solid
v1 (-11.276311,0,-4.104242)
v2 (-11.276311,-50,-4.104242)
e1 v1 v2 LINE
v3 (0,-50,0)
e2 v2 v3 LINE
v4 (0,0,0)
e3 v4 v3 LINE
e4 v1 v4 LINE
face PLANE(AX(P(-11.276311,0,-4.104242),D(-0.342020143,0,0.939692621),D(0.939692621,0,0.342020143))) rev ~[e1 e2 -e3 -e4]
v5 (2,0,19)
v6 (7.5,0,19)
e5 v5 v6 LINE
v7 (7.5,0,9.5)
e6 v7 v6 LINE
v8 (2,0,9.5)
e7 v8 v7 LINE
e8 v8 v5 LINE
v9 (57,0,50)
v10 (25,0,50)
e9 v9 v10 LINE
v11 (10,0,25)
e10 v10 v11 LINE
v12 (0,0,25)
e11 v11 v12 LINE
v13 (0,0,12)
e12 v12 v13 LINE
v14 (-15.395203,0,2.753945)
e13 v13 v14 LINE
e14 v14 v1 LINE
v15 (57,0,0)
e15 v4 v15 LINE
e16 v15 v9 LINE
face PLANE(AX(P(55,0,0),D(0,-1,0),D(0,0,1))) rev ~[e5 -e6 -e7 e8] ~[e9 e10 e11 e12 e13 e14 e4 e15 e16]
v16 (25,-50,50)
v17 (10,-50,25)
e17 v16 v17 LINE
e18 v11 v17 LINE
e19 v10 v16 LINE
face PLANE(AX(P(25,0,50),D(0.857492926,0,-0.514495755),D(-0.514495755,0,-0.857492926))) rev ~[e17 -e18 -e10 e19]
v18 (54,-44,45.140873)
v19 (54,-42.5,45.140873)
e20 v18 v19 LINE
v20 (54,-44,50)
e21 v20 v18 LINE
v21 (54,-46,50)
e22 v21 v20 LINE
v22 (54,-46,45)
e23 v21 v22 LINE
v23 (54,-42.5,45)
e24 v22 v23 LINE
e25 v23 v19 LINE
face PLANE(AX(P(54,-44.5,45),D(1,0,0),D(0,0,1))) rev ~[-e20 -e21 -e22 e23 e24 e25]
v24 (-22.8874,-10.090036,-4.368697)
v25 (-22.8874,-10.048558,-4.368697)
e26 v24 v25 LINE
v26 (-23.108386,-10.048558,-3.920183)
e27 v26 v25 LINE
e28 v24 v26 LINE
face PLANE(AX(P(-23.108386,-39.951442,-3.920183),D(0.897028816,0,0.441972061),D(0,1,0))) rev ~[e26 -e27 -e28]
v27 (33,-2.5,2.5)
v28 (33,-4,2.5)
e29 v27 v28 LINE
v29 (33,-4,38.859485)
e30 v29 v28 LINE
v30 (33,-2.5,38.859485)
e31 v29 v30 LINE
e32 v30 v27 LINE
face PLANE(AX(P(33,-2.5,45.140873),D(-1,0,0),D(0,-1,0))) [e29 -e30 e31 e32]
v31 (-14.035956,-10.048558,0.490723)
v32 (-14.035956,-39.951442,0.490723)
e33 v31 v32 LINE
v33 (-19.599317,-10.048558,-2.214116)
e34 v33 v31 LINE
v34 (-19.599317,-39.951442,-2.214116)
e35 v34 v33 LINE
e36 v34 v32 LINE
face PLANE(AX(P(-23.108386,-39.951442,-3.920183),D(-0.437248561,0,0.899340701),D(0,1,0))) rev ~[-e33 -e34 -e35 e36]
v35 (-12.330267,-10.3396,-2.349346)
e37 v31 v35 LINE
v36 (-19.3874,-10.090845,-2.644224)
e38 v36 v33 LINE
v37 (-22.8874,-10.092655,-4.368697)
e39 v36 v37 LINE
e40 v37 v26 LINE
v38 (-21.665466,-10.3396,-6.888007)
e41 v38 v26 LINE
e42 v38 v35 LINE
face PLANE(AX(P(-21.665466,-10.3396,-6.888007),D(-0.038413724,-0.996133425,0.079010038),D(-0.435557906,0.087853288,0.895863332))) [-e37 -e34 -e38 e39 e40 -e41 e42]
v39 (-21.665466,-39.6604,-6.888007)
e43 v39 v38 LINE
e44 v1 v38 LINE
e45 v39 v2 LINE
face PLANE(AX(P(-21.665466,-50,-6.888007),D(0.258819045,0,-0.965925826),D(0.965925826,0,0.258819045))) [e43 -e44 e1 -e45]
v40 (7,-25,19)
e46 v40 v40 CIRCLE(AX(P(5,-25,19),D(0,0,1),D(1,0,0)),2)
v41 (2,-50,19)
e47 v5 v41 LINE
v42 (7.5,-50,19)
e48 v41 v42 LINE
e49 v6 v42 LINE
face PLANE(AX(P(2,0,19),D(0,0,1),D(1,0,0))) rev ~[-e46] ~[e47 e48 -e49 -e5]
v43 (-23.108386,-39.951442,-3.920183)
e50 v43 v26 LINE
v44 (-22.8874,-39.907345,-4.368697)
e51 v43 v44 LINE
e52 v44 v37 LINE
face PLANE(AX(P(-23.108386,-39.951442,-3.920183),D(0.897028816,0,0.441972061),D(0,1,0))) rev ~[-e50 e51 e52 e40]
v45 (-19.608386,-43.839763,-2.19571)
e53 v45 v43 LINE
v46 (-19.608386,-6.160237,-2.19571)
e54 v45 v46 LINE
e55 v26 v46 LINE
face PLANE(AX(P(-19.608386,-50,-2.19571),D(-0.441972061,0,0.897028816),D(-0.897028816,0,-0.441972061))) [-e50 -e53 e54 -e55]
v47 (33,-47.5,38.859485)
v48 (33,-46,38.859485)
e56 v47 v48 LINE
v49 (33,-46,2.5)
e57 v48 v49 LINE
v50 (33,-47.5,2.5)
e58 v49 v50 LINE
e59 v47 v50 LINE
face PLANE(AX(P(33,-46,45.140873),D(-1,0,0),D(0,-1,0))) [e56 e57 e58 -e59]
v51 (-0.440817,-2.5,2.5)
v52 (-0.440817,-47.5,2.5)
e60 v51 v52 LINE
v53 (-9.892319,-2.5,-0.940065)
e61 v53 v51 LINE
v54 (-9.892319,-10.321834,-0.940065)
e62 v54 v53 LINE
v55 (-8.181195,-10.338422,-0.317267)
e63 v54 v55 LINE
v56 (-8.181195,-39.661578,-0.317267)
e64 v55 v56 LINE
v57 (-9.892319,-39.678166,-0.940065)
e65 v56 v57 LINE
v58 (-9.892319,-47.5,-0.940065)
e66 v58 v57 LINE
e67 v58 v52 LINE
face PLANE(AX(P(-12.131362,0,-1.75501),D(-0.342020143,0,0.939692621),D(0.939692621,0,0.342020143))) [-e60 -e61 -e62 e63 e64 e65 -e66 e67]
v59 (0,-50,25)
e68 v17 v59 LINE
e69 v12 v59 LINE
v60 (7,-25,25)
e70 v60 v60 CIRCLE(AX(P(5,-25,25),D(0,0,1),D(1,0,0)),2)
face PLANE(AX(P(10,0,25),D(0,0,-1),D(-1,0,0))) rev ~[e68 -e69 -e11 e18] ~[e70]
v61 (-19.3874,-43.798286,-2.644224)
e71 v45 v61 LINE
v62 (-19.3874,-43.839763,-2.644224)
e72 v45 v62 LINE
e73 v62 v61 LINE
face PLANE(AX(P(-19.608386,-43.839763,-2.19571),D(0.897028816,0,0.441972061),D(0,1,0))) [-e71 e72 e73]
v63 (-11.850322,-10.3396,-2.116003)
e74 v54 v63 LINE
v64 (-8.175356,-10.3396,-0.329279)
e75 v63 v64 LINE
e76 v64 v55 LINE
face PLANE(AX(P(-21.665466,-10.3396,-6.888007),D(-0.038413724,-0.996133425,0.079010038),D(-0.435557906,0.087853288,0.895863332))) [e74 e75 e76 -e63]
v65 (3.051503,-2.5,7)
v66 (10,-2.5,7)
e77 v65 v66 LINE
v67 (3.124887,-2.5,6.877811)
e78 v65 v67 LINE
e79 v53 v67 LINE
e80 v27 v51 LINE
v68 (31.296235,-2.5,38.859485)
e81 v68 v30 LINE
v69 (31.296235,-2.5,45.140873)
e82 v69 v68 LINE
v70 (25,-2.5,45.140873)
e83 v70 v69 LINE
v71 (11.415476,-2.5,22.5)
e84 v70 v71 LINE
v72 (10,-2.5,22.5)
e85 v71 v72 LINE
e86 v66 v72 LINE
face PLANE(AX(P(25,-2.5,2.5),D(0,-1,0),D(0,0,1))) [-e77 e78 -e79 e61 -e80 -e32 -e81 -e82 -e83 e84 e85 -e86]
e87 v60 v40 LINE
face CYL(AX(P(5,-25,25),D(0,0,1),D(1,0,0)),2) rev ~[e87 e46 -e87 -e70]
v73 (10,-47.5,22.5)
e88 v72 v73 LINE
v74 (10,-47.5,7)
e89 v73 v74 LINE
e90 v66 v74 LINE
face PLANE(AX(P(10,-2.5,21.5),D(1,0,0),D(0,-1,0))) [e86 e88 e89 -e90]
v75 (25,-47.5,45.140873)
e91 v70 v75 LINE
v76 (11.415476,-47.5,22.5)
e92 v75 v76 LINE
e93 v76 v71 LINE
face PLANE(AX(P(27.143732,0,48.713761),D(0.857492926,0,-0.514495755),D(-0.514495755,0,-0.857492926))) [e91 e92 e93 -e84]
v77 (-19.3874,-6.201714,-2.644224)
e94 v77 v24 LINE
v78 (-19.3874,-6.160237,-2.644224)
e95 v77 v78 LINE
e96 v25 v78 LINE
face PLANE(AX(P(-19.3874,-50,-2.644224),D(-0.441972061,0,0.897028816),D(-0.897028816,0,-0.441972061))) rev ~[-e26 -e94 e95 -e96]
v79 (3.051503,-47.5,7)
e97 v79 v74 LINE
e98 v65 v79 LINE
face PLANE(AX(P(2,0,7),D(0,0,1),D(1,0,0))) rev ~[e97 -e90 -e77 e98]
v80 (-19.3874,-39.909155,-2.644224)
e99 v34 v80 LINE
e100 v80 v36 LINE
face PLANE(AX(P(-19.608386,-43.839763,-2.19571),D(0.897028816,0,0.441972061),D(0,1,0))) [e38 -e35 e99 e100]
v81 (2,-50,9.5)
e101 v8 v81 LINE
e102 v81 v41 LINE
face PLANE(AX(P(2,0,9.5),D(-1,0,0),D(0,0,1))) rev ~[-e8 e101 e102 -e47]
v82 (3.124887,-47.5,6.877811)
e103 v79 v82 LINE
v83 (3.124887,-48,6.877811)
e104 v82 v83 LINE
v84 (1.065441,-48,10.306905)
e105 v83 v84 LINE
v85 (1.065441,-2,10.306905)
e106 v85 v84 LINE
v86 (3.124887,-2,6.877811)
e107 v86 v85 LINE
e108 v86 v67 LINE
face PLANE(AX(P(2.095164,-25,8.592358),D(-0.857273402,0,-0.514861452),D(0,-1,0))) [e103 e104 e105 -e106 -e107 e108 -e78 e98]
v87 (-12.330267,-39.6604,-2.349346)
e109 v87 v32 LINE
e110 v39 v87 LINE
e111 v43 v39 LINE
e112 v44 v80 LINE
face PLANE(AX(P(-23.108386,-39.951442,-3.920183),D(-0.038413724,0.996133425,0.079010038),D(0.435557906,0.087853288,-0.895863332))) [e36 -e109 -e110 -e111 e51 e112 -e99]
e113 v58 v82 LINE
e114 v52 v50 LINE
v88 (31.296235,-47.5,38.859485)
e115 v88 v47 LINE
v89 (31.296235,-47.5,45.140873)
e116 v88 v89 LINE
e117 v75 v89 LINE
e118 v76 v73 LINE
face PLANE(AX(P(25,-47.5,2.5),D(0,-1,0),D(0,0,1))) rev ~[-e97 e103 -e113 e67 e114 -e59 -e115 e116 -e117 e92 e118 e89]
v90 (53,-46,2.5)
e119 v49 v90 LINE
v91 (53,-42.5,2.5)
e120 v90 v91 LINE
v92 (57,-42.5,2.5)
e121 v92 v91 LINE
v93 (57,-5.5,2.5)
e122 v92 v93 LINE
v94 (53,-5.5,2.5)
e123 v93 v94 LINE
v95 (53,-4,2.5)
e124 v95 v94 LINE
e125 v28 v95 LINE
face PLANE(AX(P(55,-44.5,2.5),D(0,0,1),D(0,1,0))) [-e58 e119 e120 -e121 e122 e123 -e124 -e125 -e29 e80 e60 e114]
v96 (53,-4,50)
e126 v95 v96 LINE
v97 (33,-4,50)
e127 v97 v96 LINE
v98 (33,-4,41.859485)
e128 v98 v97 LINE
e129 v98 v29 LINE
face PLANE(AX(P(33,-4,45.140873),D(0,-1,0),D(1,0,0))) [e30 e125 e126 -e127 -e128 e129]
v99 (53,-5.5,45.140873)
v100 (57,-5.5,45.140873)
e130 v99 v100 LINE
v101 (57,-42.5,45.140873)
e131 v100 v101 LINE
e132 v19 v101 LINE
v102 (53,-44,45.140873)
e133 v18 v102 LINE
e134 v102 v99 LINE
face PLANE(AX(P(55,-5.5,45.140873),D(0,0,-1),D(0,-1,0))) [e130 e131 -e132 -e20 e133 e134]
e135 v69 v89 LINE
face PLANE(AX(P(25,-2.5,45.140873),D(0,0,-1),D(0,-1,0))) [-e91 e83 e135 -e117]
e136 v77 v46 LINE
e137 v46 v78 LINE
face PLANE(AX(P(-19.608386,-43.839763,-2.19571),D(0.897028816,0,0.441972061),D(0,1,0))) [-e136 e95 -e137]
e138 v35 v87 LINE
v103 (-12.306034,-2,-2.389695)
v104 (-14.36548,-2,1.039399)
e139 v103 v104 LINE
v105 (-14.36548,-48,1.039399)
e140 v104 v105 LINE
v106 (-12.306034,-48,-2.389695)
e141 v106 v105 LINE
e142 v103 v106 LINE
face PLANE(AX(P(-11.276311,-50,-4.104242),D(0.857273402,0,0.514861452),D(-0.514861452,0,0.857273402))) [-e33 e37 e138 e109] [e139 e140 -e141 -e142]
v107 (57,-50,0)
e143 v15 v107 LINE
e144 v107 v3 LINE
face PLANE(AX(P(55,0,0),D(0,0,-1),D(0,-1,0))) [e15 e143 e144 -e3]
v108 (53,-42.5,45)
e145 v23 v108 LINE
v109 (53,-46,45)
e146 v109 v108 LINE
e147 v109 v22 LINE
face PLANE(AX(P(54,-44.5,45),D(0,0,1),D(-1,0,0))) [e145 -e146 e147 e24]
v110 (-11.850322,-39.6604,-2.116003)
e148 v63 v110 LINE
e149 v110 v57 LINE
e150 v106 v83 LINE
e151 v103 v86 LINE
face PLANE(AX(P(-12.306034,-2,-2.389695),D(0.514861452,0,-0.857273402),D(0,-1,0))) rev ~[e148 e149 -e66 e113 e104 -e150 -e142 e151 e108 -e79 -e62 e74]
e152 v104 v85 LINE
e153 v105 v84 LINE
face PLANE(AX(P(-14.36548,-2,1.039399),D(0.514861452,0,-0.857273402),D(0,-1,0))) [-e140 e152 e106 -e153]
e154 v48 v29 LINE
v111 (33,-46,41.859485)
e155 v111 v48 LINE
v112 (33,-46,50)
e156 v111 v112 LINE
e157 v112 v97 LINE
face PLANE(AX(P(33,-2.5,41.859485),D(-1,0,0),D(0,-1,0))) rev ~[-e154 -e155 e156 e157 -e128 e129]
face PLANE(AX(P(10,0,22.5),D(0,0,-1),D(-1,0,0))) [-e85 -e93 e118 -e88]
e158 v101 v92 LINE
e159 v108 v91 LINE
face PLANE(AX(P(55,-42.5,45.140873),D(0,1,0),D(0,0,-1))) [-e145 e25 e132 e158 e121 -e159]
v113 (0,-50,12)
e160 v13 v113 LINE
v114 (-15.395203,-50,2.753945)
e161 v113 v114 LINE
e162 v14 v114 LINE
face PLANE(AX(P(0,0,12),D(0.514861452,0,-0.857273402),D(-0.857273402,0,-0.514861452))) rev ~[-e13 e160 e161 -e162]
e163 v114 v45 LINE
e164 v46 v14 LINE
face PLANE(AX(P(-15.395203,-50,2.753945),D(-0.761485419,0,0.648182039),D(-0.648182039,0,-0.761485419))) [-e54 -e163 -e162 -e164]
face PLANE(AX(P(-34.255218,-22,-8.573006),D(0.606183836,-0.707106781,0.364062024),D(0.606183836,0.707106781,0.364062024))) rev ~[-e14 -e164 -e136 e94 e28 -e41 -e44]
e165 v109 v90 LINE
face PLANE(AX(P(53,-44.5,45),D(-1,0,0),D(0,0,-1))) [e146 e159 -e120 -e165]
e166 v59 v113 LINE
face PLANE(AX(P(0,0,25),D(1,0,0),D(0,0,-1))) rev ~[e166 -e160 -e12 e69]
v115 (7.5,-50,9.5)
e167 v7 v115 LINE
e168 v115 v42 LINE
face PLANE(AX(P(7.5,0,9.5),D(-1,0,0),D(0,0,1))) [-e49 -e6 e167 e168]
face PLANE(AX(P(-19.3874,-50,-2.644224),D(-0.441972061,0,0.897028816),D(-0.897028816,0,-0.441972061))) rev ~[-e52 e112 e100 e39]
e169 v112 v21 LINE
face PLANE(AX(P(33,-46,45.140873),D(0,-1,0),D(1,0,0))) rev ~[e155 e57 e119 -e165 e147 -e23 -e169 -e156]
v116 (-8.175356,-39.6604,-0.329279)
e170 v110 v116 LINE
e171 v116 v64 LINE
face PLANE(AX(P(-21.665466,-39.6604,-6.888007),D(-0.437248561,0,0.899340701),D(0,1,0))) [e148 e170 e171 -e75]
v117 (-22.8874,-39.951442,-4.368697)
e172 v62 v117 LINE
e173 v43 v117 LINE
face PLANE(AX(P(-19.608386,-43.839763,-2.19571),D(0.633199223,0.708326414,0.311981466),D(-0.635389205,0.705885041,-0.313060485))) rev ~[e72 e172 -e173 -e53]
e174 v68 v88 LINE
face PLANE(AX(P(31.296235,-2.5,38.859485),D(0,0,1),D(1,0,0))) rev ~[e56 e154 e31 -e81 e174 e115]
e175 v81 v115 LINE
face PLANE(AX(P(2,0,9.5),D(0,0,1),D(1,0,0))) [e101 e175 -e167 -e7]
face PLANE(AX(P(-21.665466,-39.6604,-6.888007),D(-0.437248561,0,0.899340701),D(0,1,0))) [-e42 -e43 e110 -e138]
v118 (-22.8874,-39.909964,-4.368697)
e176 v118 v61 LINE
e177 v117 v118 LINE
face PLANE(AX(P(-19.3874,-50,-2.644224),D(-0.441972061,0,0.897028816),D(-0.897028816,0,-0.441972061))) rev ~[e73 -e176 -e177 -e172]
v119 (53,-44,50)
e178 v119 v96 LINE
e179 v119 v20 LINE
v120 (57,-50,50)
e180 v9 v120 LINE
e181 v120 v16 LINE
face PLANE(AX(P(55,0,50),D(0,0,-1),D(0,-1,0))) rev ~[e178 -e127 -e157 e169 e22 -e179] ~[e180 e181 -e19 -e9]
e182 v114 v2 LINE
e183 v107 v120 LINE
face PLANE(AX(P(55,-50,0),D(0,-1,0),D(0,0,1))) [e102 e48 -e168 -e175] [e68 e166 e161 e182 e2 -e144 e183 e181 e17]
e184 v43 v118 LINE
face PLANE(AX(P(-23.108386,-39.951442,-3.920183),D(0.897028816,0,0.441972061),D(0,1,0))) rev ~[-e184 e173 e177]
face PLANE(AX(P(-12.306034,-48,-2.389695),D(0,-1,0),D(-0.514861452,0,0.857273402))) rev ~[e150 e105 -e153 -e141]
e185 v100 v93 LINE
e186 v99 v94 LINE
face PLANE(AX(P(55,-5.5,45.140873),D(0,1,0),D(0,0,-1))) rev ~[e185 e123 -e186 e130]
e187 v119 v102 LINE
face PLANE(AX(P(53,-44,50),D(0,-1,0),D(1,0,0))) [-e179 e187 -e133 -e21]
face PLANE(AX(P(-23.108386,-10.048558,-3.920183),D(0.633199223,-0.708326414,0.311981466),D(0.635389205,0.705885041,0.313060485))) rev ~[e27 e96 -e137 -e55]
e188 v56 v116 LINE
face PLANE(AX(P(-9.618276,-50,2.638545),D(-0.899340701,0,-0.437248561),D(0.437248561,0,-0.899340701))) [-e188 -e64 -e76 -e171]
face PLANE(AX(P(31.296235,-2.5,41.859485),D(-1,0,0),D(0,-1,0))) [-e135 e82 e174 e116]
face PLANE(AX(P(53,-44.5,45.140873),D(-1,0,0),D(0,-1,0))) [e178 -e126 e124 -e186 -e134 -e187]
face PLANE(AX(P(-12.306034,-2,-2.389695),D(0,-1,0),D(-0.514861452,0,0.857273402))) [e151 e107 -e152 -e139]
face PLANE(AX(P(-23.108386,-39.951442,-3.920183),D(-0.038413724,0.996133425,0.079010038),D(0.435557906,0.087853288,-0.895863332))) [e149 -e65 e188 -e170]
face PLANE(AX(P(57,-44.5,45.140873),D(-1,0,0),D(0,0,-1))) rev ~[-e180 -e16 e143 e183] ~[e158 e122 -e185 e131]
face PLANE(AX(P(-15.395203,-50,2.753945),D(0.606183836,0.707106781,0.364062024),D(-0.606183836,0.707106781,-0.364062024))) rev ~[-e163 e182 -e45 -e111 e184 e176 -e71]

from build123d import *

# Parameters (mm, degrees)
F0_W      = 5.5
F0_H      = 9.5
F1_DEPTH  = 50
F2_T      = -2.5
F3_W      = 46
F3_H      = 4
F4_DEPTH  = 18
F5_DEPTH  = 30
F6_W      = 2
F6_H      = 3
F7_DEPTH  = 42.640873421
F8_W      = 20
F8_H      = 42
F9_DEPTH  = 4.859126579
F10_W     = 1.7037652433
F10_H     = 3.2813884318
F11_DEPTH = 45
F12_W     = 1
F12_H     = 2
F13_DEPTH = 5
F14_DEPTH = 42.640873421
F15_DEPTH = 5
F16_DEPTH = 3
F17_DEPTH = 2
F20_DEPTH = 50
F21_DEPTH = 25
F22_DEPTH = 15
F23_DEPTH = 0.5
F24_DEPTH = 3
F25_DEPTH = 2
F26_R     = 2
F27_DEPTH = 6


with BuildPart() as f1:
    # F0 (on Front) → F1 (new body)
    with BuildSketch(Plane.XZ):
        Polygon((0, 12), (0, 0), (20, 0), (20, 25), (10, 25), (0, 25), align=None)
        with Locations((4.75, 14.25)):
            Rectangle(F0_W, F0_H, mode=Mode.SUBTRACT)
        Polygon((20, 25), (20, 0), (25, 0), (25, 50), (10, 25), align=None)
        Polygon((-11.2763114494, -4.1042417199), (0, 0), (0, 12), (-15.3952030634, 2.7539454948), align=None)
    extrude(amount=F1_DEPTH)

    # F2
    f2_openings = [f1.faces().sort_by_distance(p)[0] for p in [
        (25, -25, 25),
    ]]
    offset(amount=F2_T, openings=f2_openings, kind=Kind.INTERSECTION)

    # F3 (on face) → F4 (cut)
    with BuildSketch(Plane(origin=(-10.0986787248, 0, -6.0650667312), x_dir=(0, -1, 0), z_dir=(-0.8572734018, 0, -0.5148614518))):
        with Locations((25, 6.2872808221)):
            Rectangle(F3_W, F3_H)
    extrude(amount=-F4_DEPTH, mode=Mode.SUBTRACT)

    # F5 (add): a face of the model
    f5_faces = [f1.faces().sort_by_distance(p)[0] for p in [
        (25, -25, 0.7071067812),
    ]]
    extrude(f5_faces, amount=F5_DEPTH)

    # F6 (on face) → F7 (join, through all)
    with BuildSketch(Plane(origin=(0, 0, 45.140873421), x_dir=(1, 0, 0), z_dir=(0, 0, -1))):
        with Locations((54, 46)):
            Rectangle(F6_W, F6_H)
        with Locations((54, 4)):
            Rectangle(F6_W, F6_H)
    extrude(amount=F7_DEPTH)

    # F8 (on face) → F9 (cut, through all)
    with BuildSketch(Plane.XY.offset(50)):
        with Locations((43, -25)):
            Rectangle(F8_W, F8_H)
    extrude(amount=-F9_DEPTH, mode=Mode.SUBTRACT)

    # F10 (on face) → F11 (join, through all)
    with BuildSketch(Plane.XZ.offset(2.5)):
        with Locations((32.1481173784, 43.5001792051)):
            Rectangle(F10_W, F10_H)
    extrude(amount=F11_DEPTH)

    # F12 (on face) → F13 (cut)
    with BuildSketch(Plane.XY.offset(50)):
        with Locations((53.5, -45)):
            Rectangle(F12_W, F12_H)
    extrude(amount=-F13_DEPTH, mode=Mode.SUBTRACT)

    # F14 (add, through all): faces of the model
    f14_faces = [f1.faces().sort_by_distance(p)[0] for p in [
        (43, -46.75, 45.140873421),
        (43, -3.25, 45.140873421),
    ]]
    extrude(f14_faces, amount=F14_DEPTH)

    # F15 (add): a face of the model
    f15_faces = [f1.faces().sort_by_distance(p)[0] for p in [
        (55, -25, 0.7071067812),
    ]]
    extrude(f15_faces, amount=F15_DEPTH)

    # F16 (add): a face of the model
    f16_faces = [f1.faces().sort_by_distance(p)[0] for p in [
        (32.1481173784, -25, 41.8594849892),
    ]]
    extrude(f16_faces, amount=F16_DEPTH)

    # F17 (add): a face of the model
    f17_faces = [f1.faces().sort_by_distance(p)[0] for p in [
        (56.5014165477, -44.5, 23.810402831),
    ]]
    extrude(f17_faces, amount=F17_DEPTH)

    # F19 (on face) → F20 (join)
    with BuildSketch(Plane.XZ.offset(50)):
        Polygon((-11.2763114494, -4.1042417199), (-15.3952030634, 2.7539454948), (-19.6083863192, -2.1957097309), (-23.1083863192, -3.9201829974), (-21.6654660693, -6.8880073104), align=None)
    extrude(amount=-F20_DEPTH)

    # F18 (on face) → F21 (cut)
    with BuildSketch(Plane(origin=(-5.2965243386, 0, 8.819012226), x_dir=(0.8572734018, 0, 0.5148614518), z_dir=(-0.5148614518, 0, 0.8572734018))):
        Polygon((-33.7799977267, -50), (-11.7799977267, -50), (-33.7799977267, -28), align=None)
        Polygon((-33.7799977267, -22), (-11.7799977267, 0), (-33.7799977267, 0), align=None)
    extrude(amount=-F21_DEPTH, mode=Mode.SUBTRACT)

    # F22 (cut): a face of the model
    f22_faces = [f1.faces().sort_by_distance(p)[0] for p in [
        (-22.3892898276, -25, -5.3992335904),
    ]]
    extrude(f22_faces, amount=-F22_DEPTH, mode=Mode.SUBTRACT)

    # F23 (add): a face of the model
    f23_faces = [f1.faces().sort_by_distance(p)[0] for p in [
        (-21.2912627093, -25, -3.0248741153),
    ]]
    extrude(f23_faces, amount=-F23_DEPTH)

    # F24 (cut): a face of the model
    f24_faces = [f1.faces().sort_by_distance(p)[0] for p in [
        (60, -25, 0.7071067812),
    ]]
    extrude(f24_faces, amount=-F24_DEPTH, mode=Mode.SUBTRACT)

    # F25 (add): a face of the model
    f25_faces = [f1.faces().sort_by_distance(p)[0] for p in [
        (6.25, -25, 21.5),
    ]]
    extrude(f25_faces, amount=F25_DEPTH)

    # F26 (on face) → F27 (cut)
    with BuildSketch(Plane.XY.offset(25)):
        with Locations((5, -25)):
            Circle(F26_R)
    extrude(amount=-F27_DEPTH, mode=Mode.SUBTRACT)


solid = f1.part
